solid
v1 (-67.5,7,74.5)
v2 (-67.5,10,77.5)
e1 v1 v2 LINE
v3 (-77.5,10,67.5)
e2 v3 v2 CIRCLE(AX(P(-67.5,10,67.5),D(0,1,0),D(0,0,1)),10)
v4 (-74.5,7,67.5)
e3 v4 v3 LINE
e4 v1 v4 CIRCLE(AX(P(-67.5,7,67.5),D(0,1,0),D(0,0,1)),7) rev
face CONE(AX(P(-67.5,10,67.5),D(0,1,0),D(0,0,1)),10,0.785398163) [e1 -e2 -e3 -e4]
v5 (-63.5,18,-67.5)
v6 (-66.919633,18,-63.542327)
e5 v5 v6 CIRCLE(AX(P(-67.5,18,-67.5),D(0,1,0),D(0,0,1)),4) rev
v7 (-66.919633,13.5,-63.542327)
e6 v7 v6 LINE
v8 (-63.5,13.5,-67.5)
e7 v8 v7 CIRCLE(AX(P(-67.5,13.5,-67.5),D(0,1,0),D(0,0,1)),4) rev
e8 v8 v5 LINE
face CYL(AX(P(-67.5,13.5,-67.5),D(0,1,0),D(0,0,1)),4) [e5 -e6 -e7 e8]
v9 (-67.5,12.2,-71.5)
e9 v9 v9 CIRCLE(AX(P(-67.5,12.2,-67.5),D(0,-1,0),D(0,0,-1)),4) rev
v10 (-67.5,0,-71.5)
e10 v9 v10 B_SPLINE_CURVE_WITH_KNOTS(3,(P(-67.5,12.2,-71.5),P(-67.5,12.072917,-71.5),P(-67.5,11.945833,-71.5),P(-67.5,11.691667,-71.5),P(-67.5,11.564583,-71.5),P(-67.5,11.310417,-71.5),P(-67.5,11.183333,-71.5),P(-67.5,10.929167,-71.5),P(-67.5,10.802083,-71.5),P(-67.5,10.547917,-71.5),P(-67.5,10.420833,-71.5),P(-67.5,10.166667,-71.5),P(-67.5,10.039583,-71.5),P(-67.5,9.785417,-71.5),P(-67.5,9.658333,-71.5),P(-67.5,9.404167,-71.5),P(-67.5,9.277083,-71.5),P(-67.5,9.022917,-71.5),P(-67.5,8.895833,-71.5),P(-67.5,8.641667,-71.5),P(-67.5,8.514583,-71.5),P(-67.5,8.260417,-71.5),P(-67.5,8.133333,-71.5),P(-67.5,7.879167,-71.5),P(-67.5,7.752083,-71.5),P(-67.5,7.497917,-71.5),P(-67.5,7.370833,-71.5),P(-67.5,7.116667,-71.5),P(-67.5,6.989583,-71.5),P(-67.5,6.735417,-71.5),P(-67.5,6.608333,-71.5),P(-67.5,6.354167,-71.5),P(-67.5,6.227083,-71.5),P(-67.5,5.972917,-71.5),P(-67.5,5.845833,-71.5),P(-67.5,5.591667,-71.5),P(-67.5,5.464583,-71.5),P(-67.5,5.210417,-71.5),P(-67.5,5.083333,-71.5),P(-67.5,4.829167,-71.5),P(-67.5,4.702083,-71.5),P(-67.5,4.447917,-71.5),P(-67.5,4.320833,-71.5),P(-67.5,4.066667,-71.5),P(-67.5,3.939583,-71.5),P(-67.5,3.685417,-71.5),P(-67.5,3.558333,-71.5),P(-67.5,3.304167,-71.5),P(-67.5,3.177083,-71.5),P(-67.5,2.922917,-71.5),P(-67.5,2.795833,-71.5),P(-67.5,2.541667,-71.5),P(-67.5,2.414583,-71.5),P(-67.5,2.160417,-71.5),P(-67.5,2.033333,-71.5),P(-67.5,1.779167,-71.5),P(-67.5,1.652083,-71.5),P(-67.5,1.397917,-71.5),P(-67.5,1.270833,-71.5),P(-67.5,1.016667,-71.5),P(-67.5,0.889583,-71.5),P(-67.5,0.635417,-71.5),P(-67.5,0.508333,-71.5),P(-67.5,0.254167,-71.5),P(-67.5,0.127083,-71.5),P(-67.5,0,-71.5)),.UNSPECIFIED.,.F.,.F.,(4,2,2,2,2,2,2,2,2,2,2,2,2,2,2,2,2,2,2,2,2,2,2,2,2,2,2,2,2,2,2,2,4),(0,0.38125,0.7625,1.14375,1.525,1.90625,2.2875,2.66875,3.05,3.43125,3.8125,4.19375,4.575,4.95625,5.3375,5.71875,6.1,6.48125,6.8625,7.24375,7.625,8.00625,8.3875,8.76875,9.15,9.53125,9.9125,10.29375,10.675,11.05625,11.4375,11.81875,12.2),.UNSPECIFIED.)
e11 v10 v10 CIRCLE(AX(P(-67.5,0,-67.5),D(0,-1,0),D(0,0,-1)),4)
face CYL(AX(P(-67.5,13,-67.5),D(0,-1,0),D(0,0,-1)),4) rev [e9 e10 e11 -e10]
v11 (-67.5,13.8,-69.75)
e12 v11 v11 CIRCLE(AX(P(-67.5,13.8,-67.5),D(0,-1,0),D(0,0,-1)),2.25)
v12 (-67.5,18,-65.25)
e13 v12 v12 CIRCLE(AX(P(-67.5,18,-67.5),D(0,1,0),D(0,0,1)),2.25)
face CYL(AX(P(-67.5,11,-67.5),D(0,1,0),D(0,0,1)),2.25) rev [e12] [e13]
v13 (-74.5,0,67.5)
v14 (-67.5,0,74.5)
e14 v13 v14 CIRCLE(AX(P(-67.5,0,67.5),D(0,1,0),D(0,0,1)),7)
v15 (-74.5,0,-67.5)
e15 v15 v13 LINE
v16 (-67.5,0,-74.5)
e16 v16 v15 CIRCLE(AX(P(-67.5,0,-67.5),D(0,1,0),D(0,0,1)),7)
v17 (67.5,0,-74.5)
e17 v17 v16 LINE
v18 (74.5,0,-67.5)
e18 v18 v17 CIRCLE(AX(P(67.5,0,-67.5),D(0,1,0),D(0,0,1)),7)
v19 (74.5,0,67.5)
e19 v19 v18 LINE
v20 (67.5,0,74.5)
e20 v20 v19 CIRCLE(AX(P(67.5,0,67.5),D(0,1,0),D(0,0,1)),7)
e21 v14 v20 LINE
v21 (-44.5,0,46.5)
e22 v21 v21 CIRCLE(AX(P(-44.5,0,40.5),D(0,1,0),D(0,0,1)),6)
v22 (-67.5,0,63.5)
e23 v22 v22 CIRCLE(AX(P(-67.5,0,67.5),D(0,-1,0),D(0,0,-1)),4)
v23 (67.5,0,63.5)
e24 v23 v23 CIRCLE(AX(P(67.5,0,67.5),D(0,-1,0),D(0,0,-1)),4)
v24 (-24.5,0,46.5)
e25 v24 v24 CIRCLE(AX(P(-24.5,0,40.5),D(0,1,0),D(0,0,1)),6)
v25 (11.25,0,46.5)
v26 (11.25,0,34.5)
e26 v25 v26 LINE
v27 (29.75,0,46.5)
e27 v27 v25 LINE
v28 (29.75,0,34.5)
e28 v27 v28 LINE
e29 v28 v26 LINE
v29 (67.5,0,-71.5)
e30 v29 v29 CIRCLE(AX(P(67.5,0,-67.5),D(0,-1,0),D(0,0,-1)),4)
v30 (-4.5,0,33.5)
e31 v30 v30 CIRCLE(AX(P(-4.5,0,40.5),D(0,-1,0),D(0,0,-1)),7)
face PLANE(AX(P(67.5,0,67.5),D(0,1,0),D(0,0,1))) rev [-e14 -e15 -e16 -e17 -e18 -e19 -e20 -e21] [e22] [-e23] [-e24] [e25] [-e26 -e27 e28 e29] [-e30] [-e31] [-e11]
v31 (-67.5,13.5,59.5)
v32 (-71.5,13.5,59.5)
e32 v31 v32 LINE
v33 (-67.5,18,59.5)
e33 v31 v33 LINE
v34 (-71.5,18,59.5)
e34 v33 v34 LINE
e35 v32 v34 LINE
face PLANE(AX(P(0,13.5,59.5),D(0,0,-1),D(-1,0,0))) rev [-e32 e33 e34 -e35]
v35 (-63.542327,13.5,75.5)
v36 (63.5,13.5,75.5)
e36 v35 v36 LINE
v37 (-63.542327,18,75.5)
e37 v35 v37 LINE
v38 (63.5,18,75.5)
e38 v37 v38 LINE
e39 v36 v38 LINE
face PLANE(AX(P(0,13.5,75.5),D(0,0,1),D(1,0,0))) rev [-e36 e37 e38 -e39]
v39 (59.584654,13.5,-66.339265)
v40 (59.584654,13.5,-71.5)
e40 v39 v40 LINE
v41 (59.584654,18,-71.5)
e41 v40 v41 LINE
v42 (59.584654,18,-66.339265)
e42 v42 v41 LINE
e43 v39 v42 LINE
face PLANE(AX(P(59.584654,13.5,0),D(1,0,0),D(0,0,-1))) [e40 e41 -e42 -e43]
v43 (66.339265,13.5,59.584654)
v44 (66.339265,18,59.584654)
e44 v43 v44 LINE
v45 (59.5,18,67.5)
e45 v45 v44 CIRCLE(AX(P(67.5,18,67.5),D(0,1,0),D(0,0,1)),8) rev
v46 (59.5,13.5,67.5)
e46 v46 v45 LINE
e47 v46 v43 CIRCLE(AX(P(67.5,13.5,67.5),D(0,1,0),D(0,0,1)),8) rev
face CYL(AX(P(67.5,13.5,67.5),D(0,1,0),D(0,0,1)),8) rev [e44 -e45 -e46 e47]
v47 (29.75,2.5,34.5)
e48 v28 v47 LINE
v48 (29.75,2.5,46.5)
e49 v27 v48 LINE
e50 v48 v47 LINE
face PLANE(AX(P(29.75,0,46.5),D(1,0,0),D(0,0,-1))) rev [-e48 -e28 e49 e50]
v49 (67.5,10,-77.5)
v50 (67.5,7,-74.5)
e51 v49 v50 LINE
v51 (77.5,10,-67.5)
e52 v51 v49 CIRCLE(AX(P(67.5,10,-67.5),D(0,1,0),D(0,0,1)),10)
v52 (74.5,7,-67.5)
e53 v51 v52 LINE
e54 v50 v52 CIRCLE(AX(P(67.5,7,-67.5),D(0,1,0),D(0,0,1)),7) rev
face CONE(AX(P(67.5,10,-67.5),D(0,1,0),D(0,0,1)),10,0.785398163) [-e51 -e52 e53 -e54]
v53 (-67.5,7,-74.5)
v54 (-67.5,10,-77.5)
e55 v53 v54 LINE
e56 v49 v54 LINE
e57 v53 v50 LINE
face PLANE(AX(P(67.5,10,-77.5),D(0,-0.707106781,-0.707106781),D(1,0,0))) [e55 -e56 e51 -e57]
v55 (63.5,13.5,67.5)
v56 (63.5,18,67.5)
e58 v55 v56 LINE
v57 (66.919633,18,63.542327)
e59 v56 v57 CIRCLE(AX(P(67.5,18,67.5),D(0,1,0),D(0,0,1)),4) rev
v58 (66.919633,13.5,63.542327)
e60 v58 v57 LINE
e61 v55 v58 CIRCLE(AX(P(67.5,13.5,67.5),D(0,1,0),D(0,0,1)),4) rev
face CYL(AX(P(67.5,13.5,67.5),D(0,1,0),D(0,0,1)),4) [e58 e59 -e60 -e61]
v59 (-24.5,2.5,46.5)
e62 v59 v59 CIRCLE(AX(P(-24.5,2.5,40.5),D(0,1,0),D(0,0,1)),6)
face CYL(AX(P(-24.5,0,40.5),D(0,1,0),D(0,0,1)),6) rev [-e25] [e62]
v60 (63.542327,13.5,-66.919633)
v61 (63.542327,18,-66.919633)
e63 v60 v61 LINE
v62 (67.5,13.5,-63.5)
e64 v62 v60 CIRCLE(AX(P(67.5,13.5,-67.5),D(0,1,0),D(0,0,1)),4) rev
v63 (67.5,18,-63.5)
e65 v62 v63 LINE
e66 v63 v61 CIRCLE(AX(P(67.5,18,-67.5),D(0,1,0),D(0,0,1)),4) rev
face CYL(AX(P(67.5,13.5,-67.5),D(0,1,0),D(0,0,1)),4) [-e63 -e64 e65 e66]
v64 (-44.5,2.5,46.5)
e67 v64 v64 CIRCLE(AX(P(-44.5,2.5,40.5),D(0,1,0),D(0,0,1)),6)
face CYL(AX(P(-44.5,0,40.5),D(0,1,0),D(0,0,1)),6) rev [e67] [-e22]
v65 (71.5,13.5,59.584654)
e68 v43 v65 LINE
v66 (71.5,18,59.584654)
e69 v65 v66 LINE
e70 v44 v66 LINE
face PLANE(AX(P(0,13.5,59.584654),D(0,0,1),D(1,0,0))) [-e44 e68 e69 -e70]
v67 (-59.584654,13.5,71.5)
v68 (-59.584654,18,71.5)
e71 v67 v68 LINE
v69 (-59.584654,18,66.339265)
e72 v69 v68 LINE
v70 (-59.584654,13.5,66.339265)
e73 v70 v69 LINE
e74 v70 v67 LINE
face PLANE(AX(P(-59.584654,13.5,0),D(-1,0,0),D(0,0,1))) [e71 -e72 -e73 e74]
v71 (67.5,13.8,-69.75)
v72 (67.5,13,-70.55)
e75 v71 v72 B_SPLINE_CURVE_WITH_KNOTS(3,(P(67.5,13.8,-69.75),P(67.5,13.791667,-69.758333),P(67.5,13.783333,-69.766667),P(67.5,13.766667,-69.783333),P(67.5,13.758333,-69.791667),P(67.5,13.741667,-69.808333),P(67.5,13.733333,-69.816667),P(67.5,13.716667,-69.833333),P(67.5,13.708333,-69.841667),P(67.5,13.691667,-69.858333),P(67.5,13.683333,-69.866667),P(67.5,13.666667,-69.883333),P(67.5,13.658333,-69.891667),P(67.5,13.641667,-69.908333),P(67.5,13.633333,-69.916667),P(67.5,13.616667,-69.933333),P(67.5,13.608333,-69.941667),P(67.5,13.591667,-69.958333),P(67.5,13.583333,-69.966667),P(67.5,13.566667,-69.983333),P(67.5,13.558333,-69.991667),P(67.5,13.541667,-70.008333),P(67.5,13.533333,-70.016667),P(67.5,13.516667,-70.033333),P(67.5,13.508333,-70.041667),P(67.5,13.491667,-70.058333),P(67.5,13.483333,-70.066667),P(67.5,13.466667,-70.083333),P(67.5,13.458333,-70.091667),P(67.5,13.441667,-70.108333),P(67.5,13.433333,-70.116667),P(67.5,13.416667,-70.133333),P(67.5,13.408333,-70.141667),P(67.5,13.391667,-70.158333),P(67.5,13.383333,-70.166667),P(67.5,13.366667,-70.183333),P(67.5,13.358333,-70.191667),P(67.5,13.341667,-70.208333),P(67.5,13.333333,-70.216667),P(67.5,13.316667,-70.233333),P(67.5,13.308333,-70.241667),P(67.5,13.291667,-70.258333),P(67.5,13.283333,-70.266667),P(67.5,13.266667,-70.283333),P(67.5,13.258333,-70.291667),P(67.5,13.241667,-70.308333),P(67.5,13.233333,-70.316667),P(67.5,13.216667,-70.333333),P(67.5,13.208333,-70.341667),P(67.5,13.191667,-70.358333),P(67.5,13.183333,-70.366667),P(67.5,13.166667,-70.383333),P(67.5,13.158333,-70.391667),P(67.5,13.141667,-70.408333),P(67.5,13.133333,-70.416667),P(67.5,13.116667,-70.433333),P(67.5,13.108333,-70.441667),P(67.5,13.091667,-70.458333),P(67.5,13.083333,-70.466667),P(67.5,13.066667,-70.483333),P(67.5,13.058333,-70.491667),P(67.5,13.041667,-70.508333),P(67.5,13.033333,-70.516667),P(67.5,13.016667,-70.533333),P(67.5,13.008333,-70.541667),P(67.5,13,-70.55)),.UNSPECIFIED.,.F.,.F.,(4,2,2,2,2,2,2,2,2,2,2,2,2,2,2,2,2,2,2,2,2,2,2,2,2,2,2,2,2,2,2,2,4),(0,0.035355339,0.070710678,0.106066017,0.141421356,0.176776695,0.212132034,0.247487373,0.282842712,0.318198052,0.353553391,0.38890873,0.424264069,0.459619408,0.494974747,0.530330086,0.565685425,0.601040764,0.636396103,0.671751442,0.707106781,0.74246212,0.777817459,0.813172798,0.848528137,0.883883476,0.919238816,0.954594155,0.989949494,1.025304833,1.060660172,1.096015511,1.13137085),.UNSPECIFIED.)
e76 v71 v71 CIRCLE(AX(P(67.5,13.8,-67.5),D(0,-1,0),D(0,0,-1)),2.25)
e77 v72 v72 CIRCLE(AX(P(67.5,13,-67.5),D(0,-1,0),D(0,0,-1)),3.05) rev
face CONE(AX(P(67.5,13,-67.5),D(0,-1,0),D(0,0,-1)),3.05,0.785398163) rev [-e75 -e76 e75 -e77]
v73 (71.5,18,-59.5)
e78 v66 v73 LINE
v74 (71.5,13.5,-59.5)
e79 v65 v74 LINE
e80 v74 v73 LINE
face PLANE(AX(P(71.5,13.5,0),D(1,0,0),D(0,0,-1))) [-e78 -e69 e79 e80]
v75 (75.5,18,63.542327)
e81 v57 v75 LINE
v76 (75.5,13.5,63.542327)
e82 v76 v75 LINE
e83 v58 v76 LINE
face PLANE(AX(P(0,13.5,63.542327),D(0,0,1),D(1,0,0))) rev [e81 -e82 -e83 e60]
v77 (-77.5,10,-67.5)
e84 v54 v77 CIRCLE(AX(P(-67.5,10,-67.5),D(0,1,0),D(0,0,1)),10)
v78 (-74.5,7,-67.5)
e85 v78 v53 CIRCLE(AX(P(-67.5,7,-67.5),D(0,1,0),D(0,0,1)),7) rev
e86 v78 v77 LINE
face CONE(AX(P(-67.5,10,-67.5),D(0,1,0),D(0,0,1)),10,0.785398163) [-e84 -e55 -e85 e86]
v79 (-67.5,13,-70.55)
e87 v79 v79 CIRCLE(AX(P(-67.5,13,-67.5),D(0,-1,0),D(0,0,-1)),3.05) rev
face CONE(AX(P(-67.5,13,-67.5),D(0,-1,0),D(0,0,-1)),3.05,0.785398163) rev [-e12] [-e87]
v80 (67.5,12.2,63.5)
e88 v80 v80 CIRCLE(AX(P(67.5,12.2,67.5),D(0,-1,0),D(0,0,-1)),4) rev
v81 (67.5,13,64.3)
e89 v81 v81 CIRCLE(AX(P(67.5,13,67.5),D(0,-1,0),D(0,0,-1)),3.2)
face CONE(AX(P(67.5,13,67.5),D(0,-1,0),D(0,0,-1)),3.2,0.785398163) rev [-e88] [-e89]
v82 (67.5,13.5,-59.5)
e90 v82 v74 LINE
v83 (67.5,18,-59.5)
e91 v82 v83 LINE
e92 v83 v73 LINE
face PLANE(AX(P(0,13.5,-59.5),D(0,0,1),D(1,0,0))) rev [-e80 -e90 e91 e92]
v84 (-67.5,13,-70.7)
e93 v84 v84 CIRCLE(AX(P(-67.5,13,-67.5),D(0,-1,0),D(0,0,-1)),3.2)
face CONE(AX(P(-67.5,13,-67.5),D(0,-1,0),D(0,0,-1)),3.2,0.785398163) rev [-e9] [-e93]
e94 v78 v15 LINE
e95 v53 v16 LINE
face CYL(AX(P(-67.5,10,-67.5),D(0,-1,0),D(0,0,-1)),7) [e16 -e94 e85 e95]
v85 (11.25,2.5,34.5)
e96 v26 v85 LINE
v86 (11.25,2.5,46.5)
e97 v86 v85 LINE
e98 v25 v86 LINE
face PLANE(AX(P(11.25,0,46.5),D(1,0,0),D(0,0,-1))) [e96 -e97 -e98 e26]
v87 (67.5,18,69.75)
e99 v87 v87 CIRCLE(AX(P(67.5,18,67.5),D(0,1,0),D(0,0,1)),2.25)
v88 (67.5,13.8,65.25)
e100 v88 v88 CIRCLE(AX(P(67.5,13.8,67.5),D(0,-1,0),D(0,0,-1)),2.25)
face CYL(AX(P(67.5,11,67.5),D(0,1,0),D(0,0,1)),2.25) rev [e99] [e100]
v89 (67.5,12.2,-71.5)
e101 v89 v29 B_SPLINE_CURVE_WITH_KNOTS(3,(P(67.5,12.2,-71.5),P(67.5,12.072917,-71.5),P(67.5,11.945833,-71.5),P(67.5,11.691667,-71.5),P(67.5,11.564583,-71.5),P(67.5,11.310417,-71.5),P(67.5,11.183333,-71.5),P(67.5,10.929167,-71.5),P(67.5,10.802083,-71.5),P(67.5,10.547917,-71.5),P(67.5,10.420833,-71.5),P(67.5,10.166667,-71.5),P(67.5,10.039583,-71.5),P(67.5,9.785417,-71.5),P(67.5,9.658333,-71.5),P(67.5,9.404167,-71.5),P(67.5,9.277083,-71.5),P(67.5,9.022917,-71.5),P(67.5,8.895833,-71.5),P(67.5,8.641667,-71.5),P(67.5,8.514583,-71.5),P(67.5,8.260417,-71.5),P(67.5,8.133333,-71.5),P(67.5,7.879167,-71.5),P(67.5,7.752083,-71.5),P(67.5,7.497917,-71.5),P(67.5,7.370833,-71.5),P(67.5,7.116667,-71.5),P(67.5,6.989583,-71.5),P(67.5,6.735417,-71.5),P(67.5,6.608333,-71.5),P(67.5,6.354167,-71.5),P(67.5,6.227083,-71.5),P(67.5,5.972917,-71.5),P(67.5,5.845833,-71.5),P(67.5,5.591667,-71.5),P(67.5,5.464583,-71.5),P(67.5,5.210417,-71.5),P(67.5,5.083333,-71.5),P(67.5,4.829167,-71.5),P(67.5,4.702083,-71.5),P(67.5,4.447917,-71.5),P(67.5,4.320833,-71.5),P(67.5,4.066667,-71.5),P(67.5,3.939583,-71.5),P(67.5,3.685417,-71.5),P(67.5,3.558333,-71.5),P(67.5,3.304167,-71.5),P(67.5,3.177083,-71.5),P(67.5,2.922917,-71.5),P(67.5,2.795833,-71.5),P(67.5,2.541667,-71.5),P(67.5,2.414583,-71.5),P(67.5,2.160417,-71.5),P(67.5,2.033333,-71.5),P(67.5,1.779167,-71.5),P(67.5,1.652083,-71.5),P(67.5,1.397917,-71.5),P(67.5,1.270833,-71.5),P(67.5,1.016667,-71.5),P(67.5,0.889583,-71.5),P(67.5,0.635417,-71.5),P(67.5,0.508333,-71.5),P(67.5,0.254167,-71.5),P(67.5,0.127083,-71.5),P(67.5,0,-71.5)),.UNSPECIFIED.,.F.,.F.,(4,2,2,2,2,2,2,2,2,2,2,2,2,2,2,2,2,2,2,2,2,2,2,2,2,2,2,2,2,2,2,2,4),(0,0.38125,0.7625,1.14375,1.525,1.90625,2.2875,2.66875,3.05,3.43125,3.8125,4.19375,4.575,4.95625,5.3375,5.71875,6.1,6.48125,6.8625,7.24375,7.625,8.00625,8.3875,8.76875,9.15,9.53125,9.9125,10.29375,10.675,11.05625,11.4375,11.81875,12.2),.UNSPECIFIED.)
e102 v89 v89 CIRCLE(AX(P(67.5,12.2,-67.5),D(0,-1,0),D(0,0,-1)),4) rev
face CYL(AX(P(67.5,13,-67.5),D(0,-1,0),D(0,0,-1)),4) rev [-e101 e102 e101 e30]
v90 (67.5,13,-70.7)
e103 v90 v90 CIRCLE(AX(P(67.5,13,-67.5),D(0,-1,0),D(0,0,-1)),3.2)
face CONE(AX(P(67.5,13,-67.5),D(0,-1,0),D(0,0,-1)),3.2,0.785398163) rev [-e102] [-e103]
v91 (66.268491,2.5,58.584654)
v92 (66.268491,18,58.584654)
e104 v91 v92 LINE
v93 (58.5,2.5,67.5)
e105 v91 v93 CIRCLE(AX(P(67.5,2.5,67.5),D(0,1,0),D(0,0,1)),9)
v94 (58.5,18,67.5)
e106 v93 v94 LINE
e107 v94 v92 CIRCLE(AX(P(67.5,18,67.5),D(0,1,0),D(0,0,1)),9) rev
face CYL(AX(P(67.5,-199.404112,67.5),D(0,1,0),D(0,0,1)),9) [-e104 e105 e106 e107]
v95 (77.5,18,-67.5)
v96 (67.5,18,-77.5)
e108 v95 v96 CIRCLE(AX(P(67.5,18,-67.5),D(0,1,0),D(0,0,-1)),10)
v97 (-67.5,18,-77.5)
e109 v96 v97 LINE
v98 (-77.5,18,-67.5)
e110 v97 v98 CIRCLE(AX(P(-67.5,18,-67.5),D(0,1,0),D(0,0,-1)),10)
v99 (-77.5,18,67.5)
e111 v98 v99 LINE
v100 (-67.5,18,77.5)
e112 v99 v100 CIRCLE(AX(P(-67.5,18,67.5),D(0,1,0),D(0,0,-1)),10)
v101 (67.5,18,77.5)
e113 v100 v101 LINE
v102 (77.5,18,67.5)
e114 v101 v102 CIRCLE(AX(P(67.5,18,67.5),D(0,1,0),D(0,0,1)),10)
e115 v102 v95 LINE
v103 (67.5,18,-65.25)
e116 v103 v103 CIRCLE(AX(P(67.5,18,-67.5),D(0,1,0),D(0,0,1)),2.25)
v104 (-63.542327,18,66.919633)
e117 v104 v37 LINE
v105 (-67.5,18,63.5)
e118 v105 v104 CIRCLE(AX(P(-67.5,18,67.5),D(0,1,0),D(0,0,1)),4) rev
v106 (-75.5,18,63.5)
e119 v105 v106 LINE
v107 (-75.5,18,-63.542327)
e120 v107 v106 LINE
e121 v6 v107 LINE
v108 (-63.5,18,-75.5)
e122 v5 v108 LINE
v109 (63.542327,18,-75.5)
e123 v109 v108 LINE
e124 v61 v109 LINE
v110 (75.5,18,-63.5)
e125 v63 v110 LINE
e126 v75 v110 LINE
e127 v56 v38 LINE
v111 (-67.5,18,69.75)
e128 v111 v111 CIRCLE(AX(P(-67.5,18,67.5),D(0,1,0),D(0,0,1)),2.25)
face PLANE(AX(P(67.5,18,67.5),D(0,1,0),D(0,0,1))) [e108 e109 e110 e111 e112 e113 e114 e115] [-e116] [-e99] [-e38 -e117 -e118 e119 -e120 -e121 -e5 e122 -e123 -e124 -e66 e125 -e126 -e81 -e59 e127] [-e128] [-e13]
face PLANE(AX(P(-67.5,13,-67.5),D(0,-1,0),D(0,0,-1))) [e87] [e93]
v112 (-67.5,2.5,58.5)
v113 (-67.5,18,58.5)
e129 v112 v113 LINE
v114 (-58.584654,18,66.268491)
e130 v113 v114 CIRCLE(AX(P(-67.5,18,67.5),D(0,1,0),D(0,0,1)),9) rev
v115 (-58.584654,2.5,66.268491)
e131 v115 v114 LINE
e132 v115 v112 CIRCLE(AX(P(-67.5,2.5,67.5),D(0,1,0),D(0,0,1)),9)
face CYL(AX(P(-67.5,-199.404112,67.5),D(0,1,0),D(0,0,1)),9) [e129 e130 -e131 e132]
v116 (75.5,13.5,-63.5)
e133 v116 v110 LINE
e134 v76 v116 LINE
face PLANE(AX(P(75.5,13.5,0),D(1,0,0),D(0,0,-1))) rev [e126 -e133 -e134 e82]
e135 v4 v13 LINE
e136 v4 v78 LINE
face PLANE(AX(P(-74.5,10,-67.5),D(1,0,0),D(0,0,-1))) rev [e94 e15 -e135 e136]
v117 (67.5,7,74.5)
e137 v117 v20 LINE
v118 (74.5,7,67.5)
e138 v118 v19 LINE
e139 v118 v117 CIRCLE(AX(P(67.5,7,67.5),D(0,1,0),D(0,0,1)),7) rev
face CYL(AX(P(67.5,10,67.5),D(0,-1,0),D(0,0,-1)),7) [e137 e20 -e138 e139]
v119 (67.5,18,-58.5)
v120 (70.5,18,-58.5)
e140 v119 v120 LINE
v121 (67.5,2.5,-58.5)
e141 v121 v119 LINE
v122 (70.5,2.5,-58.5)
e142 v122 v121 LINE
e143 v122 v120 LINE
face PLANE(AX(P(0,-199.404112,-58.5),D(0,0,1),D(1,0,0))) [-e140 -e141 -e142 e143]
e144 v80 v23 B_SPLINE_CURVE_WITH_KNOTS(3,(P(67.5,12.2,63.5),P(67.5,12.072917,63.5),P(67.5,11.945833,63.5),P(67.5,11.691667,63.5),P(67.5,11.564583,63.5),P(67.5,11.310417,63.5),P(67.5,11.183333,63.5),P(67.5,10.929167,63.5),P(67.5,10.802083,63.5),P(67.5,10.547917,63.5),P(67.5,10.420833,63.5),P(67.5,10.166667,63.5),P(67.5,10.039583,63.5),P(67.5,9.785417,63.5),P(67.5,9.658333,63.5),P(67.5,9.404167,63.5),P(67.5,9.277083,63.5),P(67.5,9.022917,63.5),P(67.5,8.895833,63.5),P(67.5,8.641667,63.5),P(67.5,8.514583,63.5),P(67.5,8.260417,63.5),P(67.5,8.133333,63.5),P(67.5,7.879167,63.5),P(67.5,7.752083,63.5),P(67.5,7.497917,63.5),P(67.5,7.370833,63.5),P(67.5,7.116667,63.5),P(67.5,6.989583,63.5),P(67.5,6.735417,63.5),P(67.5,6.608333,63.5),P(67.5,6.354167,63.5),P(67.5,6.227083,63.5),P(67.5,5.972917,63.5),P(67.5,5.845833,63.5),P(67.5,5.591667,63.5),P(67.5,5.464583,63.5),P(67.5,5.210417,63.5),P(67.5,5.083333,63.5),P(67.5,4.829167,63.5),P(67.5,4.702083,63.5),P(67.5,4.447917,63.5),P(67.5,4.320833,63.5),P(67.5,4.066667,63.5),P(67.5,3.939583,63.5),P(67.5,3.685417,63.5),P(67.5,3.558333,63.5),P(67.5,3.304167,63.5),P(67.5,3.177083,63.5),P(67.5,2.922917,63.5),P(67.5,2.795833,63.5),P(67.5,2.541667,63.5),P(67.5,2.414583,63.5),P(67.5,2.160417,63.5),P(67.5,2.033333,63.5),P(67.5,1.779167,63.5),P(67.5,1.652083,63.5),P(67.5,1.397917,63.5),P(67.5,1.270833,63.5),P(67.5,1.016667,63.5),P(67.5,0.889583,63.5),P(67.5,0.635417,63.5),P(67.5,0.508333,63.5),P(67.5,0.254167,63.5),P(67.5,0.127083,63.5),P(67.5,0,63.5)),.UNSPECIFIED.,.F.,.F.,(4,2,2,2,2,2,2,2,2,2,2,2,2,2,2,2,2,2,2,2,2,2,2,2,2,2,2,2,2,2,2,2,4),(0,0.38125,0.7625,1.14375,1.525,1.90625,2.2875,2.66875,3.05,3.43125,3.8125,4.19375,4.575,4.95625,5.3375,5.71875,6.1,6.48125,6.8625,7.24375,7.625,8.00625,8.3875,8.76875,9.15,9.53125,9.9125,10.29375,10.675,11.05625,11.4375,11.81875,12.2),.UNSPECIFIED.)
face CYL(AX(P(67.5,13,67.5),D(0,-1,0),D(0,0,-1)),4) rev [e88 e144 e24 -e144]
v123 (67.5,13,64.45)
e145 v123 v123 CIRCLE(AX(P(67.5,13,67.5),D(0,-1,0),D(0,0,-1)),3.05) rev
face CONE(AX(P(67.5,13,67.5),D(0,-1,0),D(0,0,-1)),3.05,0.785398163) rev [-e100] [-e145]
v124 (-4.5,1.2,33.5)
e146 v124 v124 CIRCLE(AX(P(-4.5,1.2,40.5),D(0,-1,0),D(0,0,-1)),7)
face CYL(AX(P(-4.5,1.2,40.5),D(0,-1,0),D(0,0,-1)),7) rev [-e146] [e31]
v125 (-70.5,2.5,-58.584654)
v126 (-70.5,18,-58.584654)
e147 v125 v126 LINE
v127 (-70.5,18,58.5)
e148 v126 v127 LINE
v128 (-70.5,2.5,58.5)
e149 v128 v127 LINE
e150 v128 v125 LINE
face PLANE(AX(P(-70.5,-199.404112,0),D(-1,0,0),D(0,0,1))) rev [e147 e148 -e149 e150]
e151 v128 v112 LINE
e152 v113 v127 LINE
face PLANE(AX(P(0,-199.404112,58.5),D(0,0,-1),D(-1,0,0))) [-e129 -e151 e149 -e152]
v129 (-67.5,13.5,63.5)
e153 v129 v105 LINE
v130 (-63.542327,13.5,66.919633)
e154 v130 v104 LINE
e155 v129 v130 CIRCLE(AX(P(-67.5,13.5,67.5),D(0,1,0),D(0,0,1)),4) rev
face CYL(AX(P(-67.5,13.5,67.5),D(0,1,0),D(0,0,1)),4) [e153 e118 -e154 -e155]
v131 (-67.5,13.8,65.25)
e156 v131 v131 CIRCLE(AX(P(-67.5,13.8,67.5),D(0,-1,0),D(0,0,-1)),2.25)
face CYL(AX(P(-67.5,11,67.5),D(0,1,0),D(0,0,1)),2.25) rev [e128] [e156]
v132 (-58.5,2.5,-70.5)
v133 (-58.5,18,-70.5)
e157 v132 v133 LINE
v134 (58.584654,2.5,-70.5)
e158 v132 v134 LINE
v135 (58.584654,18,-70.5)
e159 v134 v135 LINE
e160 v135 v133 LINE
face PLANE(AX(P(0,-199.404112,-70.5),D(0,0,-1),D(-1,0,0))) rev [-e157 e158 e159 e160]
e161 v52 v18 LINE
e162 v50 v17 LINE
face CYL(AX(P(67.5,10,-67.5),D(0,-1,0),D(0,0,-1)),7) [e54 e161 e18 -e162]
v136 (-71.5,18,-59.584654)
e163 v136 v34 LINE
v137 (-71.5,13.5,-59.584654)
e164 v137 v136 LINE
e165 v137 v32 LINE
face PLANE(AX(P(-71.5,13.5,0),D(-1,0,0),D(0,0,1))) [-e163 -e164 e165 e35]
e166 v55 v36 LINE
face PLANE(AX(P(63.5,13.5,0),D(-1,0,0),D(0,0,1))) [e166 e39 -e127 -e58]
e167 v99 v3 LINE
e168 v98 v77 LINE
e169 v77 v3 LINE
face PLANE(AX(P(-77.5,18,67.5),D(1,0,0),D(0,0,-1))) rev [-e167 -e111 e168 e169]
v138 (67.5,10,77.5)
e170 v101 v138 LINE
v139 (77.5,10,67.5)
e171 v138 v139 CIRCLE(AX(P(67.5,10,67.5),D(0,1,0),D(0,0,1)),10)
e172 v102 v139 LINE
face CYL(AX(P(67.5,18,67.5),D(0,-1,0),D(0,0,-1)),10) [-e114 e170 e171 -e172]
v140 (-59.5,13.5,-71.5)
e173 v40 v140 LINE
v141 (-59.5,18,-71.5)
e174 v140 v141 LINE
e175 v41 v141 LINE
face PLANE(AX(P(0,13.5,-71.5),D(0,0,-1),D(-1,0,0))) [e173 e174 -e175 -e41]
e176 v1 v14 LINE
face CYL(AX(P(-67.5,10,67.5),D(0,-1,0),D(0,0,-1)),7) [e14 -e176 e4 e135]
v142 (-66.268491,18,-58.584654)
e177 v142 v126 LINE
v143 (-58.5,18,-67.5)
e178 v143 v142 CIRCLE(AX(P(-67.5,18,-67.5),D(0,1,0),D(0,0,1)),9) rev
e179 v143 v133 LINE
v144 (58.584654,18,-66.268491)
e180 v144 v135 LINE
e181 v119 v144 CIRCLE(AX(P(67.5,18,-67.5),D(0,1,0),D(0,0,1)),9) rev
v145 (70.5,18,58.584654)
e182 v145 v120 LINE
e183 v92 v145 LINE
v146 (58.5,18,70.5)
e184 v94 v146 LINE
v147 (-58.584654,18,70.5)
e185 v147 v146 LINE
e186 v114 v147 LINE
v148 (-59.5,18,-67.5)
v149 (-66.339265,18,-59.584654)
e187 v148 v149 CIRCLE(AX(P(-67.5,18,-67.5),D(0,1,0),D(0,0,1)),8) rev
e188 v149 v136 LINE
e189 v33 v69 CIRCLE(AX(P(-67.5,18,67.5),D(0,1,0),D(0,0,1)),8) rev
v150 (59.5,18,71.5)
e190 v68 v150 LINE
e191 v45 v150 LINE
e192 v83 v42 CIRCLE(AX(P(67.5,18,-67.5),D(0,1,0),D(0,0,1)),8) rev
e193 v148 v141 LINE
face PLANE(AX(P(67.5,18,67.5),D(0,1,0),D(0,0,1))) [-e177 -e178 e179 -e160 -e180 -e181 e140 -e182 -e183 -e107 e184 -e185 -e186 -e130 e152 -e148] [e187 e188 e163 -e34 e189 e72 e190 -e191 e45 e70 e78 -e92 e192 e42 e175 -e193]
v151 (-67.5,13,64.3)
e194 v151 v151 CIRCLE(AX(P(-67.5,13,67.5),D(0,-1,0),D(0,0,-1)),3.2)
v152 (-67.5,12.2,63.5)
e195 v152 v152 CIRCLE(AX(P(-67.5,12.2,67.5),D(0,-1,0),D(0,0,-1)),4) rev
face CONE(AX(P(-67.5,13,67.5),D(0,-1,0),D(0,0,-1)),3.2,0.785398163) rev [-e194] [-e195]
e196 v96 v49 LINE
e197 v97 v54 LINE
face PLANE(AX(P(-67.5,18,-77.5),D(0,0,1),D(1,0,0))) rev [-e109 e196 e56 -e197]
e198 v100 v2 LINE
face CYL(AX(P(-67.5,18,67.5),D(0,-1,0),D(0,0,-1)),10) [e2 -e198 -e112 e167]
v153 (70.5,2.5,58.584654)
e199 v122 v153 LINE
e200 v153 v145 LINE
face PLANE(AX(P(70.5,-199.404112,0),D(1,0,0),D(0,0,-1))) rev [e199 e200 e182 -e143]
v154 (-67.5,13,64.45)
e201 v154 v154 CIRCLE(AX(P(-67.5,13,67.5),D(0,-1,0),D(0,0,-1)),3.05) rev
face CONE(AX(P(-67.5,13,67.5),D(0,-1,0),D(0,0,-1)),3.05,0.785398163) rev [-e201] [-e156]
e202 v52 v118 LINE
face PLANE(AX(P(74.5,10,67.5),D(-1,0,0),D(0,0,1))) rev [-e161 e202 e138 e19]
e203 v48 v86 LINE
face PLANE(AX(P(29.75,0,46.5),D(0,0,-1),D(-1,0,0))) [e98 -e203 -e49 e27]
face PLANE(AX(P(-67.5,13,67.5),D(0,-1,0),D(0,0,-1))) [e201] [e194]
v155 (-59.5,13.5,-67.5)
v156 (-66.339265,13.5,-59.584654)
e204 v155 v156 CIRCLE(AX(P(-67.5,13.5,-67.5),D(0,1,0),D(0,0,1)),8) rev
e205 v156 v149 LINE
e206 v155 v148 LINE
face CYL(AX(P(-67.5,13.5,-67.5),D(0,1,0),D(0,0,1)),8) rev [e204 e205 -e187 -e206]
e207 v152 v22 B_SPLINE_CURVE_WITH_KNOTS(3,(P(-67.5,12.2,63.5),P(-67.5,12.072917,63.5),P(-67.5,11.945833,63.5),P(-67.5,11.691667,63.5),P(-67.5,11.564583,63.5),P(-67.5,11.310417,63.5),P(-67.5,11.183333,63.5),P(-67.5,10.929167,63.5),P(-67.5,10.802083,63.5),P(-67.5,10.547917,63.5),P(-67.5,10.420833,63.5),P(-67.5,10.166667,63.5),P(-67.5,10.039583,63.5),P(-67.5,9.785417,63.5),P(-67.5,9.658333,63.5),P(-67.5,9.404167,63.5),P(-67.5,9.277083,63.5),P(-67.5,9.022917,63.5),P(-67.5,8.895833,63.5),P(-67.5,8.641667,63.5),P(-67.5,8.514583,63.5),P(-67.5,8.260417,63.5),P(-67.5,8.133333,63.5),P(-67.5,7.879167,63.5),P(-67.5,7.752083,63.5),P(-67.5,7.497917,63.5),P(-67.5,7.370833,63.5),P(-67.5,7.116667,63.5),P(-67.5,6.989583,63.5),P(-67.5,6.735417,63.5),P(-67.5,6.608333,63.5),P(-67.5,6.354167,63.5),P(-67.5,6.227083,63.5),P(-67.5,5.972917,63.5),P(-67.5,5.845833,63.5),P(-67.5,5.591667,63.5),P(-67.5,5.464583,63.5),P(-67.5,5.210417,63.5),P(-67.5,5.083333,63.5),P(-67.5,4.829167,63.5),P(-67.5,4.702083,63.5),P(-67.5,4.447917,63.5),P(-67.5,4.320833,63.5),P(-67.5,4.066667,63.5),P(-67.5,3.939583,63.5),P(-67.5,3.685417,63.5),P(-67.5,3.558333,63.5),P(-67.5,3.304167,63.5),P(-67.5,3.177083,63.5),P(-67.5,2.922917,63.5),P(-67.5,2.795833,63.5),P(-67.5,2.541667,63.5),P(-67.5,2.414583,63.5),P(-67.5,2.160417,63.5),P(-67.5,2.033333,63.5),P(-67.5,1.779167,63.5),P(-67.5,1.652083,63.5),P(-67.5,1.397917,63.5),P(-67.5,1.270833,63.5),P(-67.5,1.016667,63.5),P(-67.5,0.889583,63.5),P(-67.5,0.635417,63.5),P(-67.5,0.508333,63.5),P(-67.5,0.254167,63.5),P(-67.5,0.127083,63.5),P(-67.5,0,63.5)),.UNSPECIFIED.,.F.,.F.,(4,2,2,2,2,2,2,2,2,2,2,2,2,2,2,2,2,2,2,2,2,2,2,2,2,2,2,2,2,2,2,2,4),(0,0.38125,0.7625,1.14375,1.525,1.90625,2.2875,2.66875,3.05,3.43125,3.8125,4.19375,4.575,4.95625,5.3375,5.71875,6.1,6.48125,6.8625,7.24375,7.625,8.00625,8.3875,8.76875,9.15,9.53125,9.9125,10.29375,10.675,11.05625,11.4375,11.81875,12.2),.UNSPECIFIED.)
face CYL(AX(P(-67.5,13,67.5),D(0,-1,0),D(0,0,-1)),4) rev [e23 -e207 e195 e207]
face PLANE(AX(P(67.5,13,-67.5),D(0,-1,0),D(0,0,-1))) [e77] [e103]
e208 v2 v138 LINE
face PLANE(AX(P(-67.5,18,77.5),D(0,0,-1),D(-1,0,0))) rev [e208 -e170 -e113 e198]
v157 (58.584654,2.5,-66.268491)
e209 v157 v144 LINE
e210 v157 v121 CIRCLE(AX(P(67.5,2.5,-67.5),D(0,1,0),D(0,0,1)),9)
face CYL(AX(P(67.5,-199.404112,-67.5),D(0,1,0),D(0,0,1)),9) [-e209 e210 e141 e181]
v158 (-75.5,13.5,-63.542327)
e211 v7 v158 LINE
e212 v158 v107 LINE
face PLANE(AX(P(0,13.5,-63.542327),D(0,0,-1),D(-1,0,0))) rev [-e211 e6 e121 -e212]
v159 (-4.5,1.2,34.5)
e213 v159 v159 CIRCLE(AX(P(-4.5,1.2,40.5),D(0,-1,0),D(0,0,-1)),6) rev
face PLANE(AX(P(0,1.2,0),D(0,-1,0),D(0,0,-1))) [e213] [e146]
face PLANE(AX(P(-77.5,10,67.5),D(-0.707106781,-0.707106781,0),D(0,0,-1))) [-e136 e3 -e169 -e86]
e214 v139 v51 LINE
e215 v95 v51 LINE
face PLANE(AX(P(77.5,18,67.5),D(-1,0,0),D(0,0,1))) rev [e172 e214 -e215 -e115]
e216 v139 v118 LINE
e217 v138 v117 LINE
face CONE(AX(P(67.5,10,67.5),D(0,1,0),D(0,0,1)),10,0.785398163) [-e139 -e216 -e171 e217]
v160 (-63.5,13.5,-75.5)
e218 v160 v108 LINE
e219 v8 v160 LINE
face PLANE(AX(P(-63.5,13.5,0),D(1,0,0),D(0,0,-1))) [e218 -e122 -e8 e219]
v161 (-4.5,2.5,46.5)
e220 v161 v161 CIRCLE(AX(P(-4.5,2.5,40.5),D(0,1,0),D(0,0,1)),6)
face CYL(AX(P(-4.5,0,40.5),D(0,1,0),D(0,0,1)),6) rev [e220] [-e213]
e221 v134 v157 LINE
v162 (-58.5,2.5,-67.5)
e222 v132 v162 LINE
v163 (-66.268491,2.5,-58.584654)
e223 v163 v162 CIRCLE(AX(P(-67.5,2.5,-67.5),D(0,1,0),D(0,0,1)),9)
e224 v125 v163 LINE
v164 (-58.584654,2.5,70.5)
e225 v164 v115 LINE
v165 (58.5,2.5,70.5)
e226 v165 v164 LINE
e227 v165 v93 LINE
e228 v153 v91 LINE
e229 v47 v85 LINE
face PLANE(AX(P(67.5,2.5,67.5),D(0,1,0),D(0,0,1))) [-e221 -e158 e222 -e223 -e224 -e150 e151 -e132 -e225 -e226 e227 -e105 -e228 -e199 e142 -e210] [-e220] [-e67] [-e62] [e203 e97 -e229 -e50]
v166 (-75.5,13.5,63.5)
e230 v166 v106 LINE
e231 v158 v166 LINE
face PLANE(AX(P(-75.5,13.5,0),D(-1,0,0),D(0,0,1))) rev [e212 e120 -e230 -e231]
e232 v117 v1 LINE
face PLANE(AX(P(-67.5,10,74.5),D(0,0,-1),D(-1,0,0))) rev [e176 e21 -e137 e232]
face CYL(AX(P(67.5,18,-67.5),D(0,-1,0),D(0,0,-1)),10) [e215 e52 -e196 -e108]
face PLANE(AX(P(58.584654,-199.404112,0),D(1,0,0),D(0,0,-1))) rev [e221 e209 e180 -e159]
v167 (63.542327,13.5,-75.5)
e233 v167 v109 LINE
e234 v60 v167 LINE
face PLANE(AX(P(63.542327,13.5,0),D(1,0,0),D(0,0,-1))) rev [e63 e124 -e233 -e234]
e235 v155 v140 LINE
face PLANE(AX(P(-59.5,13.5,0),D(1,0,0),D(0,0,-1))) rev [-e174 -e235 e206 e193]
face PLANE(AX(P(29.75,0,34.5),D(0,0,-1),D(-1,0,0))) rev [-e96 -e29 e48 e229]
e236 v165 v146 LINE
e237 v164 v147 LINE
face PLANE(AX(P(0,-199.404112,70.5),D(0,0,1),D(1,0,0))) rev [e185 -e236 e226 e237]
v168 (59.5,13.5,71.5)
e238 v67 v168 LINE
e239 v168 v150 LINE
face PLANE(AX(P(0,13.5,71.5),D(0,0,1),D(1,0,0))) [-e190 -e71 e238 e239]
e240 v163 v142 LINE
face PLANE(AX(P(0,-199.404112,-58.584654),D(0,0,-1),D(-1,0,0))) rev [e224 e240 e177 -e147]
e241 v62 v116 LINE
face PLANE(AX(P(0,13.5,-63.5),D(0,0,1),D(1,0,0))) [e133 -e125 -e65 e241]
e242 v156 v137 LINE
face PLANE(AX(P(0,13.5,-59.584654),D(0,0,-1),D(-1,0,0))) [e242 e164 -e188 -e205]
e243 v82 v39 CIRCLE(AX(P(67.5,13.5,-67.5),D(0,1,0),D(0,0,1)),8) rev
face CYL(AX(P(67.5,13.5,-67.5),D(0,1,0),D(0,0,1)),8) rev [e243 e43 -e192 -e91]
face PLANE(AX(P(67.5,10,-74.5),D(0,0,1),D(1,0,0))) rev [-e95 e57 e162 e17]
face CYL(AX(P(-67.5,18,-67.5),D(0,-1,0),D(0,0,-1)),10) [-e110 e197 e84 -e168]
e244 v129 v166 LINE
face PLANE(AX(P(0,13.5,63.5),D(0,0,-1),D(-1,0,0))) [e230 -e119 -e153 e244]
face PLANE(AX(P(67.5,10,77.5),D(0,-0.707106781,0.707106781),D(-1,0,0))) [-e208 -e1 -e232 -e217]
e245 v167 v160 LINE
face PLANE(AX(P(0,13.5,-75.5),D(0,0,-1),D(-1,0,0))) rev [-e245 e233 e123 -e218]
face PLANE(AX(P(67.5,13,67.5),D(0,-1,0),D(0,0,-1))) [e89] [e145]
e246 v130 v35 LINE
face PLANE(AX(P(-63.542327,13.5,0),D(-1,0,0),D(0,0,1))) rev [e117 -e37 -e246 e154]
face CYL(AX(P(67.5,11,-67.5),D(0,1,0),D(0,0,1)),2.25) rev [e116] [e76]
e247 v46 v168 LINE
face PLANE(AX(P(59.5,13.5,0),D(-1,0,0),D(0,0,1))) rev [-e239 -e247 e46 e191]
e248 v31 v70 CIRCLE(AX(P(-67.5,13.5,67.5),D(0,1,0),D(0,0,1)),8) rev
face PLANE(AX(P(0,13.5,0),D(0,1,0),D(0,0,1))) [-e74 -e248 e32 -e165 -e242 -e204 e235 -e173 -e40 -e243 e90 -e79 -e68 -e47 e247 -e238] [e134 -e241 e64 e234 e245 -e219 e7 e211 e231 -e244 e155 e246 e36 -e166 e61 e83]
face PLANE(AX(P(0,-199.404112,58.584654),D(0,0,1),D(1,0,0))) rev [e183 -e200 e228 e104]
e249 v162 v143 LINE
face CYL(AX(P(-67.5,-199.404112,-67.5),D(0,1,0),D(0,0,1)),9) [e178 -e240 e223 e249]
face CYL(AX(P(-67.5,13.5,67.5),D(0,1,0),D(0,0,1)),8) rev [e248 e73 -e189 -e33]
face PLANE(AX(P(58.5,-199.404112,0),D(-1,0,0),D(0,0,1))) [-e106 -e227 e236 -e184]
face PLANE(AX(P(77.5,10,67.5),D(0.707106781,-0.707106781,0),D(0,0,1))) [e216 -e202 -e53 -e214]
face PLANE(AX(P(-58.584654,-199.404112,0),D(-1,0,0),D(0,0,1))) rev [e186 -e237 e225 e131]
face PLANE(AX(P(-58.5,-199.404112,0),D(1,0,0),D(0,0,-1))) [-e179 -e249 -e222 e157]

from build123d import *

# Parameters (mm, degrees)
BOSS_EXTRUDE1_DEPTH    = 18
CUT_EXTRUDE1_DEPTH     = 10
CHAMFER1_SIZE          = 3
CUT_EXTRUDE5_START     = -15.5
CUT_EXTRUDE5_DEPTH     = 15.5
CUT_EXTRUDE6_DEPTH     = 4.5
SKETCH3_6_R            = 2.25
CUT_EXTRUDE8_DEPTH     = 7
CUT_EXTRUDE9_START     = -2.5
CUT_EXTRUDE9_OUTLINE_W = 18.5
CUT_EXTRUDE9_OUTLINE_H = 12
CUT_EXTRUDE9_OUTLINE_R = 6
CUT_EXTRUDE9_DEPTH     = 2.5
CUT_EXTRUDE17_START    = -13
SKETCH8_R              = 4
CUT_EXTRUDE17_DEPTH    = 13
CHAMFER2_SIZE          = 0.8
SKETCH10_R             = 7
SKETCH10_R_2           = 6
CUT_EXTRUDE19_DEPTH    = 1.2


# Read off the part's stored shape, not the designer's step: Cut-Extrude9
with BuildPart() as part:
    # Sketch1 → Boss-Extrude1 (new body)
    with BuildSketch(Plane(origin=(0, 0, 0), x_dir=(1, 0, 0), z_dir=(0, 1, 0))):
        with BuildLine():
            Line((-67.5, -77.5), (67.5, -77.5))
            ThreePointArc((67.5, -77.5), (74.571067812, -74.571067812), (77.5, -67.5))
            Line((77.5, -67.5), (77.5, 67.5))
            ThreePointArc((77.5, 67.5), (74.571067812, 74.571067812), (67.5, 77.5))
            Line((67.5, 77.5), (-67.5, 77.5))
            ThreePointArc((-67.5, 77.5), (-74.571067812, 74.571067812), (-77.5, 67.5))
            Line((-77.5, 67.5), (-77.5, -67.5))
            ThreePointArc((-77.5, -67.5), (-74.571067812, -74.571067812), (-67.5, -77.5))
        make_face()
    extrude(amount=BOSS_EXTRUDE1_DEPTH)

    # Sketch2 → Cut-Extrude1 (cut)
    with BuildSketch(Plane(origin=(0, 0, 0), x_dir=(1, 0, 0), z_dir=(0, 1, 0))):
        with BuildLine():
            Line((77.5, -67.5), (77.5, 67.5))
            ThreePointArc((77.5, 67.5), (74.571067812, 74.571067812), (67.5, 77.5))
            Line((67.5, 77.5), (-67.5, 77.5))
            ThreePointArc((-67.5, 77.5), (-74.571067812, 74.571067812), (-77.5, 67.5))
            Line((-77.5, 67.5), (-77.5, -67.5))
            ThreePointArc((-77.5, -67.5), (-74.571067812, -74.571067812), (-67.5, -77.5))
            Line((-67.5, -77.5), (67.5, -77.5))
            ThreePointArc((67.5, -77.5), (74.571067812, -74.571067812), (77.5, -67.5))
        make_face()
        with BuildLine():
            Line((-74.5, 67.5), (-74.5, -67.5))
            ThreePointArc((-74.5, -67.5), (-72.449747468, -72.449747468), (-67.5, -74.5))
            Line((-67.5, -74.5), (67.5, -74.5))
            ThreePointArc((67.5, -74.5), (72.449747468, -72.449747468), (74.5, -67.5))
            Line((74.5, -67.5), (74.5, 67.5))
            ThreePointArc((74.5, 67.5), (72.449747468, 72.449747468), (67.5, 74.5))
            Line((67.5, 74.5), (-67.5, 74.5))
            ThreePointArc((-67.5, 74.5), (-72.449747468, 72.449747468), (-74.5, 67.5))
        make_face(mode=Mode.SUBTRACT)
    extrude(amount=CUT_EXTRUDE1_DEPTH, mode=Mode.SUBTRACT)

    # Chamfer1
    chamfer1_edges = [part.edges().sort_by_distance(p)[0] for p in [
        (-72.449747468, 10, -72.449747468),
        (-74.5, 10, 0),
        (-72.449747468, 10, 72.449747468),
        (0, 10, 74.5),
        (72.449747468, 10, 72.449747468),
        (74.5, 10, 0),
        (72.449747468, 10, -72.449747468),
        (0, 10, -74.5),
    ]]
    chamfer(chamfer1_edges, length=CHAMFER1_SIZE - 0.0001)  # a hair under: the kernel refuses the full size

    # Sketch3 → Cut-Extrude5 (cut)
    with BuildSketch(Plane(origin=(0, 18, 0), x_dir=(1, 0, 0), z_dir=(0, 1, 0)).offset(CUT_EXTRUDE5_START)):
        with BuildLine():
            Line((67.5, 58.5), (70.5, 58.5))
            Line((70.5, 58.5), (70.5, -58.584654437))
            Line((70.5, -58.584654437), (66.268491377, -58.584654437))
            ThreePointArc((66.268491377, -58.584654437), (60.714590005, -61.58745307), (58.5, -67.5))
            Line((58.5, -67.5), (58.5, -70.5))
            Line((58.5, -70.5), (-58.584654437, -70.5))
            Line((-58.584654437, -70.5), (-58.584654437, -66.268491377))
            ThreePointArc((-58.584654437, -66.268491377), (-61.58745307, -60.714590005), (-67.5, -58.5))
            Line((-67.5, -58.5), (-70.5, -58.5))
            Line((-70.5, -58.5), (-70.5, 58.584654437))
            Line((-70.5, 58.584654437), (-66.268491377, 58.584654437))
            ThreePointArc((-66.268491377, 58.584654437), (-60.714590005, 61.58745307), (-58.5, 67.5))
            Line((-58.5, 67.5), (-58.5, 70.5))
            Line((-58.5, 70.5), (58.584654437, 70.5))
            Line((58.584654437, 70.5), (58.584654437, 66.268491377))
            ThreePointArc((58.584654437, 66.268491377), (61.58745307, 60.714590005), (67.5, 58.5))
        make_face()
    extrude(amount=CUT_EXTRUDE5_DEPTH, mode=Mode.SUBTRACT)

    # Sketch3<5> → Cut-Extrude6 (cut)
    with BuildSketch(Plane(origin=(0, 18, 0), x_dir=(1, 0, 0), z_dir=(0, 1, 0))):
        with BuildLine():
            Line((75.5, -63.542327218), (75.5, 63.5))
            Line((75.5, 63.5), (67.5, 63.5))
            ThreePointArc((67.5, 63.5), (64.884801062, 64.473329467), (63.542327218, 66.919632742))
            Line((63.542327218, 66.919632742), (63.542327218, 75.5))
            Line((63.542327218, 75.5), (-63.5, 75.5))
            Line((-63.5, 75.5), (-63.5, 67.5))
            ThreePointArc((-63.5, 67.5), (-64.473329467, 64.884801062), (-66.919632742, 63.542327218))
            Line((-66.919632742, 63.542327218), (-75.5, 63.542327218))
            Line((-75.5, 63.542327218), (-75.5, -63.5))
            Line((-75.5, -63.5), (-67.5, -63.5))
            ThreePointArc((-67.5, -63.5), (-64.884801062, -64.473329467), (-63.542327218, -66.919632742))
            Line((-63.542327218, -66.919632742), (-63.542327218, -75.5))
            Line((-63.542327218, -75.5), (63.5, -75.5))
            Line((63.5, -75.5), (63.5, -67.5))
            ThreePointArc((63.5, -67.5), (64.473329467, -64.884801062), (66.919632742, -63.542327218))
            Line((66.919632742, -63.542327218), (75.5, -63.542327218))
        make_face()
        with BuildLine():
            Line((-67.5, -59.5), (-71.5, -59.5))
            Line((-71.5, -59.5), (-71.5, 59.584654437))
            Line((-71.5, 59.584654437), (-66.339265485, 59.584654437))
            ThreePointArc((-66.339265485, 59.584654437), (-61.446658934, 62.269602124), (-59.5, 67.5))
            Line((-59.5, 67.5), (-59.5, 71.5))
            Line((-59.5, 71.5), (59.584654437, 71.5))
            Line((59.584654437, 71.5), (59.584654437, 66.339265485))
            ThreePointArc((59.584654437, 66.339265485), (62.269602124, 61.446658934), (67.5, 59.5))
            Line((67.5, 59.5), (71.5, 59.5))
            Line((71.5, 59.5), (71.5, -59.584654437))
            Line((71.5, -59.584654437), (66.339265485, -59.584654437))
            ThreePointArc((66.339265485, -59.584654437), (61.446658934, -62.269602124), (59.5, -67.5))
            Line((59.5, -67.5), (59.5, -71.5))
            Line((59.5, -71.5), (-59.584654437, -71.5))
            Line((-59.584654437, -71.5), (-59.584654437, -66.339265485))
            ThreePointArc((-59.584654437, -66.339265485), (-62.269602124, -61.446658934), (-67.5, -59.5))
        make_face(mode=Mode.SUBTRACT)
    extrude(amount=-CUT_EXTRUDE6_DEPTH, mode=Mode.SUBTRACT)

    # Sketch3<6> → Cut-Extrude8 (cut)
    with BuildSketch(Plane(origin=(0, 18, 0), x_dir=(1, 0, 0), z_dir=(0, 1, 0))):
        with Locations(Location((-67.5, -67.5, 0), (0, 0, 270))):
            Circle(SKETCH3_6_R)
        with Locations(Location((-67.5, 67.5, 0), (0, 0, 270))):
            Circle(SKETCH3_6_R)
        with Locations(Location((67.5, 67.5, 0), (0, 0, 270))):
            Circle(SKETCH3_6_R)
        with Locations(Location((67.5, -67.5, 0), (0, 0, 270))):
            Circle(SKETCH3_6_R)
    extrude(amount=-CUT_EXTRUDE8_DEPTH, mode=Mode.SUBTRACT)

    # Cut-Extrude9 outline → Cut-Extrude9 (cut)
    with BuildSketch(Plane(origin=(0, 2.5, 0), x_dir=(1, 0, 0), z_dir=(0, 1, 0)).offset(CUT_EXTRUDE9_START)):
        with Locations((20.5, -40.5)):
            Rectangle(CUT_EXTRUDE9_OUTLINE_W, CUT_EXTRUDE9_OUTLINE_H)
        with Locations((-24.5, -40.5)):
            Circle(CUT_EXTRUDE9_OUTLINE_R)
        with Locations((-4.5, -40.5)):
            Circle(CUT_EXTRUDE9_OUTLINE_R)
        with Locations((-44.5, -40.5)):
            Circle(CUT_EXTRUDE9_OUTLINE_R)
    extrude(amount=CUT_EXTRUDE9_DEPTH, mode=Mode.SUBTRACT)

    # Sketch8 → Cut-Extrude17 (cut)
    with BuildSketch(Plane.XZ.offset(CUT_EXTRUDE17_START)):
        with Locations(Location((67.5, 67.5, 0), (0, 0, 270))):
            Circle(SKETCH8_R)
        with Locations(Location((67.5, -67.5, 0), (0, 0, 270))):
            Circle(SKETCH8_R)
        with Locations(Location((-67.5, -67.5, 0), (0, 0, 270))):
            Circle(SKETCH8_R)
        with Locations(Location((-67.5, 67.5, 0), (0, 0, 270))):
            Circle(SKETCH8_R)
    extrude(amount=CUT_EXTRUDE17_DEPTH, mode=Mode.SUBTRACT)

    # Chamfer2
    chamfer2_edges = [part.edges().sort_by_distance(p)[0] for p in [
        (-67.5, 13, 71.5),
        (-67.5, 13, 65.25),
        (-67.5, 13, -63.5),
        (-67.5, 13, -69.75),
        (67.5, 13, -63.5),
        (67.5, 13, -69.75),
        (67.5, 13, 71.5),
        (67.5, 13, 65.25),
    ]]
    chamfer(chamfer2_edges, length=CHAMFER2_SIZE)

    # Sketch10 → Cut-Extrude19 (cut)
    with BuildSketch(Plane.XZ):
        with Locations(Location((-4.5, 40.5, 0), (0, 0, 270))):
            Circle(SKETCH10_R)
        with Locations(Location((-4.5, 40.5, 0), (0, 0, 90))):
            Circle(SKETCH10_R_2, mode=Mode.SUBTRACT)
    extrude(amount=-CUT_EXTRUDE19_DEPTH, mode=Mode.SUBTRACT)


solid = part.part
